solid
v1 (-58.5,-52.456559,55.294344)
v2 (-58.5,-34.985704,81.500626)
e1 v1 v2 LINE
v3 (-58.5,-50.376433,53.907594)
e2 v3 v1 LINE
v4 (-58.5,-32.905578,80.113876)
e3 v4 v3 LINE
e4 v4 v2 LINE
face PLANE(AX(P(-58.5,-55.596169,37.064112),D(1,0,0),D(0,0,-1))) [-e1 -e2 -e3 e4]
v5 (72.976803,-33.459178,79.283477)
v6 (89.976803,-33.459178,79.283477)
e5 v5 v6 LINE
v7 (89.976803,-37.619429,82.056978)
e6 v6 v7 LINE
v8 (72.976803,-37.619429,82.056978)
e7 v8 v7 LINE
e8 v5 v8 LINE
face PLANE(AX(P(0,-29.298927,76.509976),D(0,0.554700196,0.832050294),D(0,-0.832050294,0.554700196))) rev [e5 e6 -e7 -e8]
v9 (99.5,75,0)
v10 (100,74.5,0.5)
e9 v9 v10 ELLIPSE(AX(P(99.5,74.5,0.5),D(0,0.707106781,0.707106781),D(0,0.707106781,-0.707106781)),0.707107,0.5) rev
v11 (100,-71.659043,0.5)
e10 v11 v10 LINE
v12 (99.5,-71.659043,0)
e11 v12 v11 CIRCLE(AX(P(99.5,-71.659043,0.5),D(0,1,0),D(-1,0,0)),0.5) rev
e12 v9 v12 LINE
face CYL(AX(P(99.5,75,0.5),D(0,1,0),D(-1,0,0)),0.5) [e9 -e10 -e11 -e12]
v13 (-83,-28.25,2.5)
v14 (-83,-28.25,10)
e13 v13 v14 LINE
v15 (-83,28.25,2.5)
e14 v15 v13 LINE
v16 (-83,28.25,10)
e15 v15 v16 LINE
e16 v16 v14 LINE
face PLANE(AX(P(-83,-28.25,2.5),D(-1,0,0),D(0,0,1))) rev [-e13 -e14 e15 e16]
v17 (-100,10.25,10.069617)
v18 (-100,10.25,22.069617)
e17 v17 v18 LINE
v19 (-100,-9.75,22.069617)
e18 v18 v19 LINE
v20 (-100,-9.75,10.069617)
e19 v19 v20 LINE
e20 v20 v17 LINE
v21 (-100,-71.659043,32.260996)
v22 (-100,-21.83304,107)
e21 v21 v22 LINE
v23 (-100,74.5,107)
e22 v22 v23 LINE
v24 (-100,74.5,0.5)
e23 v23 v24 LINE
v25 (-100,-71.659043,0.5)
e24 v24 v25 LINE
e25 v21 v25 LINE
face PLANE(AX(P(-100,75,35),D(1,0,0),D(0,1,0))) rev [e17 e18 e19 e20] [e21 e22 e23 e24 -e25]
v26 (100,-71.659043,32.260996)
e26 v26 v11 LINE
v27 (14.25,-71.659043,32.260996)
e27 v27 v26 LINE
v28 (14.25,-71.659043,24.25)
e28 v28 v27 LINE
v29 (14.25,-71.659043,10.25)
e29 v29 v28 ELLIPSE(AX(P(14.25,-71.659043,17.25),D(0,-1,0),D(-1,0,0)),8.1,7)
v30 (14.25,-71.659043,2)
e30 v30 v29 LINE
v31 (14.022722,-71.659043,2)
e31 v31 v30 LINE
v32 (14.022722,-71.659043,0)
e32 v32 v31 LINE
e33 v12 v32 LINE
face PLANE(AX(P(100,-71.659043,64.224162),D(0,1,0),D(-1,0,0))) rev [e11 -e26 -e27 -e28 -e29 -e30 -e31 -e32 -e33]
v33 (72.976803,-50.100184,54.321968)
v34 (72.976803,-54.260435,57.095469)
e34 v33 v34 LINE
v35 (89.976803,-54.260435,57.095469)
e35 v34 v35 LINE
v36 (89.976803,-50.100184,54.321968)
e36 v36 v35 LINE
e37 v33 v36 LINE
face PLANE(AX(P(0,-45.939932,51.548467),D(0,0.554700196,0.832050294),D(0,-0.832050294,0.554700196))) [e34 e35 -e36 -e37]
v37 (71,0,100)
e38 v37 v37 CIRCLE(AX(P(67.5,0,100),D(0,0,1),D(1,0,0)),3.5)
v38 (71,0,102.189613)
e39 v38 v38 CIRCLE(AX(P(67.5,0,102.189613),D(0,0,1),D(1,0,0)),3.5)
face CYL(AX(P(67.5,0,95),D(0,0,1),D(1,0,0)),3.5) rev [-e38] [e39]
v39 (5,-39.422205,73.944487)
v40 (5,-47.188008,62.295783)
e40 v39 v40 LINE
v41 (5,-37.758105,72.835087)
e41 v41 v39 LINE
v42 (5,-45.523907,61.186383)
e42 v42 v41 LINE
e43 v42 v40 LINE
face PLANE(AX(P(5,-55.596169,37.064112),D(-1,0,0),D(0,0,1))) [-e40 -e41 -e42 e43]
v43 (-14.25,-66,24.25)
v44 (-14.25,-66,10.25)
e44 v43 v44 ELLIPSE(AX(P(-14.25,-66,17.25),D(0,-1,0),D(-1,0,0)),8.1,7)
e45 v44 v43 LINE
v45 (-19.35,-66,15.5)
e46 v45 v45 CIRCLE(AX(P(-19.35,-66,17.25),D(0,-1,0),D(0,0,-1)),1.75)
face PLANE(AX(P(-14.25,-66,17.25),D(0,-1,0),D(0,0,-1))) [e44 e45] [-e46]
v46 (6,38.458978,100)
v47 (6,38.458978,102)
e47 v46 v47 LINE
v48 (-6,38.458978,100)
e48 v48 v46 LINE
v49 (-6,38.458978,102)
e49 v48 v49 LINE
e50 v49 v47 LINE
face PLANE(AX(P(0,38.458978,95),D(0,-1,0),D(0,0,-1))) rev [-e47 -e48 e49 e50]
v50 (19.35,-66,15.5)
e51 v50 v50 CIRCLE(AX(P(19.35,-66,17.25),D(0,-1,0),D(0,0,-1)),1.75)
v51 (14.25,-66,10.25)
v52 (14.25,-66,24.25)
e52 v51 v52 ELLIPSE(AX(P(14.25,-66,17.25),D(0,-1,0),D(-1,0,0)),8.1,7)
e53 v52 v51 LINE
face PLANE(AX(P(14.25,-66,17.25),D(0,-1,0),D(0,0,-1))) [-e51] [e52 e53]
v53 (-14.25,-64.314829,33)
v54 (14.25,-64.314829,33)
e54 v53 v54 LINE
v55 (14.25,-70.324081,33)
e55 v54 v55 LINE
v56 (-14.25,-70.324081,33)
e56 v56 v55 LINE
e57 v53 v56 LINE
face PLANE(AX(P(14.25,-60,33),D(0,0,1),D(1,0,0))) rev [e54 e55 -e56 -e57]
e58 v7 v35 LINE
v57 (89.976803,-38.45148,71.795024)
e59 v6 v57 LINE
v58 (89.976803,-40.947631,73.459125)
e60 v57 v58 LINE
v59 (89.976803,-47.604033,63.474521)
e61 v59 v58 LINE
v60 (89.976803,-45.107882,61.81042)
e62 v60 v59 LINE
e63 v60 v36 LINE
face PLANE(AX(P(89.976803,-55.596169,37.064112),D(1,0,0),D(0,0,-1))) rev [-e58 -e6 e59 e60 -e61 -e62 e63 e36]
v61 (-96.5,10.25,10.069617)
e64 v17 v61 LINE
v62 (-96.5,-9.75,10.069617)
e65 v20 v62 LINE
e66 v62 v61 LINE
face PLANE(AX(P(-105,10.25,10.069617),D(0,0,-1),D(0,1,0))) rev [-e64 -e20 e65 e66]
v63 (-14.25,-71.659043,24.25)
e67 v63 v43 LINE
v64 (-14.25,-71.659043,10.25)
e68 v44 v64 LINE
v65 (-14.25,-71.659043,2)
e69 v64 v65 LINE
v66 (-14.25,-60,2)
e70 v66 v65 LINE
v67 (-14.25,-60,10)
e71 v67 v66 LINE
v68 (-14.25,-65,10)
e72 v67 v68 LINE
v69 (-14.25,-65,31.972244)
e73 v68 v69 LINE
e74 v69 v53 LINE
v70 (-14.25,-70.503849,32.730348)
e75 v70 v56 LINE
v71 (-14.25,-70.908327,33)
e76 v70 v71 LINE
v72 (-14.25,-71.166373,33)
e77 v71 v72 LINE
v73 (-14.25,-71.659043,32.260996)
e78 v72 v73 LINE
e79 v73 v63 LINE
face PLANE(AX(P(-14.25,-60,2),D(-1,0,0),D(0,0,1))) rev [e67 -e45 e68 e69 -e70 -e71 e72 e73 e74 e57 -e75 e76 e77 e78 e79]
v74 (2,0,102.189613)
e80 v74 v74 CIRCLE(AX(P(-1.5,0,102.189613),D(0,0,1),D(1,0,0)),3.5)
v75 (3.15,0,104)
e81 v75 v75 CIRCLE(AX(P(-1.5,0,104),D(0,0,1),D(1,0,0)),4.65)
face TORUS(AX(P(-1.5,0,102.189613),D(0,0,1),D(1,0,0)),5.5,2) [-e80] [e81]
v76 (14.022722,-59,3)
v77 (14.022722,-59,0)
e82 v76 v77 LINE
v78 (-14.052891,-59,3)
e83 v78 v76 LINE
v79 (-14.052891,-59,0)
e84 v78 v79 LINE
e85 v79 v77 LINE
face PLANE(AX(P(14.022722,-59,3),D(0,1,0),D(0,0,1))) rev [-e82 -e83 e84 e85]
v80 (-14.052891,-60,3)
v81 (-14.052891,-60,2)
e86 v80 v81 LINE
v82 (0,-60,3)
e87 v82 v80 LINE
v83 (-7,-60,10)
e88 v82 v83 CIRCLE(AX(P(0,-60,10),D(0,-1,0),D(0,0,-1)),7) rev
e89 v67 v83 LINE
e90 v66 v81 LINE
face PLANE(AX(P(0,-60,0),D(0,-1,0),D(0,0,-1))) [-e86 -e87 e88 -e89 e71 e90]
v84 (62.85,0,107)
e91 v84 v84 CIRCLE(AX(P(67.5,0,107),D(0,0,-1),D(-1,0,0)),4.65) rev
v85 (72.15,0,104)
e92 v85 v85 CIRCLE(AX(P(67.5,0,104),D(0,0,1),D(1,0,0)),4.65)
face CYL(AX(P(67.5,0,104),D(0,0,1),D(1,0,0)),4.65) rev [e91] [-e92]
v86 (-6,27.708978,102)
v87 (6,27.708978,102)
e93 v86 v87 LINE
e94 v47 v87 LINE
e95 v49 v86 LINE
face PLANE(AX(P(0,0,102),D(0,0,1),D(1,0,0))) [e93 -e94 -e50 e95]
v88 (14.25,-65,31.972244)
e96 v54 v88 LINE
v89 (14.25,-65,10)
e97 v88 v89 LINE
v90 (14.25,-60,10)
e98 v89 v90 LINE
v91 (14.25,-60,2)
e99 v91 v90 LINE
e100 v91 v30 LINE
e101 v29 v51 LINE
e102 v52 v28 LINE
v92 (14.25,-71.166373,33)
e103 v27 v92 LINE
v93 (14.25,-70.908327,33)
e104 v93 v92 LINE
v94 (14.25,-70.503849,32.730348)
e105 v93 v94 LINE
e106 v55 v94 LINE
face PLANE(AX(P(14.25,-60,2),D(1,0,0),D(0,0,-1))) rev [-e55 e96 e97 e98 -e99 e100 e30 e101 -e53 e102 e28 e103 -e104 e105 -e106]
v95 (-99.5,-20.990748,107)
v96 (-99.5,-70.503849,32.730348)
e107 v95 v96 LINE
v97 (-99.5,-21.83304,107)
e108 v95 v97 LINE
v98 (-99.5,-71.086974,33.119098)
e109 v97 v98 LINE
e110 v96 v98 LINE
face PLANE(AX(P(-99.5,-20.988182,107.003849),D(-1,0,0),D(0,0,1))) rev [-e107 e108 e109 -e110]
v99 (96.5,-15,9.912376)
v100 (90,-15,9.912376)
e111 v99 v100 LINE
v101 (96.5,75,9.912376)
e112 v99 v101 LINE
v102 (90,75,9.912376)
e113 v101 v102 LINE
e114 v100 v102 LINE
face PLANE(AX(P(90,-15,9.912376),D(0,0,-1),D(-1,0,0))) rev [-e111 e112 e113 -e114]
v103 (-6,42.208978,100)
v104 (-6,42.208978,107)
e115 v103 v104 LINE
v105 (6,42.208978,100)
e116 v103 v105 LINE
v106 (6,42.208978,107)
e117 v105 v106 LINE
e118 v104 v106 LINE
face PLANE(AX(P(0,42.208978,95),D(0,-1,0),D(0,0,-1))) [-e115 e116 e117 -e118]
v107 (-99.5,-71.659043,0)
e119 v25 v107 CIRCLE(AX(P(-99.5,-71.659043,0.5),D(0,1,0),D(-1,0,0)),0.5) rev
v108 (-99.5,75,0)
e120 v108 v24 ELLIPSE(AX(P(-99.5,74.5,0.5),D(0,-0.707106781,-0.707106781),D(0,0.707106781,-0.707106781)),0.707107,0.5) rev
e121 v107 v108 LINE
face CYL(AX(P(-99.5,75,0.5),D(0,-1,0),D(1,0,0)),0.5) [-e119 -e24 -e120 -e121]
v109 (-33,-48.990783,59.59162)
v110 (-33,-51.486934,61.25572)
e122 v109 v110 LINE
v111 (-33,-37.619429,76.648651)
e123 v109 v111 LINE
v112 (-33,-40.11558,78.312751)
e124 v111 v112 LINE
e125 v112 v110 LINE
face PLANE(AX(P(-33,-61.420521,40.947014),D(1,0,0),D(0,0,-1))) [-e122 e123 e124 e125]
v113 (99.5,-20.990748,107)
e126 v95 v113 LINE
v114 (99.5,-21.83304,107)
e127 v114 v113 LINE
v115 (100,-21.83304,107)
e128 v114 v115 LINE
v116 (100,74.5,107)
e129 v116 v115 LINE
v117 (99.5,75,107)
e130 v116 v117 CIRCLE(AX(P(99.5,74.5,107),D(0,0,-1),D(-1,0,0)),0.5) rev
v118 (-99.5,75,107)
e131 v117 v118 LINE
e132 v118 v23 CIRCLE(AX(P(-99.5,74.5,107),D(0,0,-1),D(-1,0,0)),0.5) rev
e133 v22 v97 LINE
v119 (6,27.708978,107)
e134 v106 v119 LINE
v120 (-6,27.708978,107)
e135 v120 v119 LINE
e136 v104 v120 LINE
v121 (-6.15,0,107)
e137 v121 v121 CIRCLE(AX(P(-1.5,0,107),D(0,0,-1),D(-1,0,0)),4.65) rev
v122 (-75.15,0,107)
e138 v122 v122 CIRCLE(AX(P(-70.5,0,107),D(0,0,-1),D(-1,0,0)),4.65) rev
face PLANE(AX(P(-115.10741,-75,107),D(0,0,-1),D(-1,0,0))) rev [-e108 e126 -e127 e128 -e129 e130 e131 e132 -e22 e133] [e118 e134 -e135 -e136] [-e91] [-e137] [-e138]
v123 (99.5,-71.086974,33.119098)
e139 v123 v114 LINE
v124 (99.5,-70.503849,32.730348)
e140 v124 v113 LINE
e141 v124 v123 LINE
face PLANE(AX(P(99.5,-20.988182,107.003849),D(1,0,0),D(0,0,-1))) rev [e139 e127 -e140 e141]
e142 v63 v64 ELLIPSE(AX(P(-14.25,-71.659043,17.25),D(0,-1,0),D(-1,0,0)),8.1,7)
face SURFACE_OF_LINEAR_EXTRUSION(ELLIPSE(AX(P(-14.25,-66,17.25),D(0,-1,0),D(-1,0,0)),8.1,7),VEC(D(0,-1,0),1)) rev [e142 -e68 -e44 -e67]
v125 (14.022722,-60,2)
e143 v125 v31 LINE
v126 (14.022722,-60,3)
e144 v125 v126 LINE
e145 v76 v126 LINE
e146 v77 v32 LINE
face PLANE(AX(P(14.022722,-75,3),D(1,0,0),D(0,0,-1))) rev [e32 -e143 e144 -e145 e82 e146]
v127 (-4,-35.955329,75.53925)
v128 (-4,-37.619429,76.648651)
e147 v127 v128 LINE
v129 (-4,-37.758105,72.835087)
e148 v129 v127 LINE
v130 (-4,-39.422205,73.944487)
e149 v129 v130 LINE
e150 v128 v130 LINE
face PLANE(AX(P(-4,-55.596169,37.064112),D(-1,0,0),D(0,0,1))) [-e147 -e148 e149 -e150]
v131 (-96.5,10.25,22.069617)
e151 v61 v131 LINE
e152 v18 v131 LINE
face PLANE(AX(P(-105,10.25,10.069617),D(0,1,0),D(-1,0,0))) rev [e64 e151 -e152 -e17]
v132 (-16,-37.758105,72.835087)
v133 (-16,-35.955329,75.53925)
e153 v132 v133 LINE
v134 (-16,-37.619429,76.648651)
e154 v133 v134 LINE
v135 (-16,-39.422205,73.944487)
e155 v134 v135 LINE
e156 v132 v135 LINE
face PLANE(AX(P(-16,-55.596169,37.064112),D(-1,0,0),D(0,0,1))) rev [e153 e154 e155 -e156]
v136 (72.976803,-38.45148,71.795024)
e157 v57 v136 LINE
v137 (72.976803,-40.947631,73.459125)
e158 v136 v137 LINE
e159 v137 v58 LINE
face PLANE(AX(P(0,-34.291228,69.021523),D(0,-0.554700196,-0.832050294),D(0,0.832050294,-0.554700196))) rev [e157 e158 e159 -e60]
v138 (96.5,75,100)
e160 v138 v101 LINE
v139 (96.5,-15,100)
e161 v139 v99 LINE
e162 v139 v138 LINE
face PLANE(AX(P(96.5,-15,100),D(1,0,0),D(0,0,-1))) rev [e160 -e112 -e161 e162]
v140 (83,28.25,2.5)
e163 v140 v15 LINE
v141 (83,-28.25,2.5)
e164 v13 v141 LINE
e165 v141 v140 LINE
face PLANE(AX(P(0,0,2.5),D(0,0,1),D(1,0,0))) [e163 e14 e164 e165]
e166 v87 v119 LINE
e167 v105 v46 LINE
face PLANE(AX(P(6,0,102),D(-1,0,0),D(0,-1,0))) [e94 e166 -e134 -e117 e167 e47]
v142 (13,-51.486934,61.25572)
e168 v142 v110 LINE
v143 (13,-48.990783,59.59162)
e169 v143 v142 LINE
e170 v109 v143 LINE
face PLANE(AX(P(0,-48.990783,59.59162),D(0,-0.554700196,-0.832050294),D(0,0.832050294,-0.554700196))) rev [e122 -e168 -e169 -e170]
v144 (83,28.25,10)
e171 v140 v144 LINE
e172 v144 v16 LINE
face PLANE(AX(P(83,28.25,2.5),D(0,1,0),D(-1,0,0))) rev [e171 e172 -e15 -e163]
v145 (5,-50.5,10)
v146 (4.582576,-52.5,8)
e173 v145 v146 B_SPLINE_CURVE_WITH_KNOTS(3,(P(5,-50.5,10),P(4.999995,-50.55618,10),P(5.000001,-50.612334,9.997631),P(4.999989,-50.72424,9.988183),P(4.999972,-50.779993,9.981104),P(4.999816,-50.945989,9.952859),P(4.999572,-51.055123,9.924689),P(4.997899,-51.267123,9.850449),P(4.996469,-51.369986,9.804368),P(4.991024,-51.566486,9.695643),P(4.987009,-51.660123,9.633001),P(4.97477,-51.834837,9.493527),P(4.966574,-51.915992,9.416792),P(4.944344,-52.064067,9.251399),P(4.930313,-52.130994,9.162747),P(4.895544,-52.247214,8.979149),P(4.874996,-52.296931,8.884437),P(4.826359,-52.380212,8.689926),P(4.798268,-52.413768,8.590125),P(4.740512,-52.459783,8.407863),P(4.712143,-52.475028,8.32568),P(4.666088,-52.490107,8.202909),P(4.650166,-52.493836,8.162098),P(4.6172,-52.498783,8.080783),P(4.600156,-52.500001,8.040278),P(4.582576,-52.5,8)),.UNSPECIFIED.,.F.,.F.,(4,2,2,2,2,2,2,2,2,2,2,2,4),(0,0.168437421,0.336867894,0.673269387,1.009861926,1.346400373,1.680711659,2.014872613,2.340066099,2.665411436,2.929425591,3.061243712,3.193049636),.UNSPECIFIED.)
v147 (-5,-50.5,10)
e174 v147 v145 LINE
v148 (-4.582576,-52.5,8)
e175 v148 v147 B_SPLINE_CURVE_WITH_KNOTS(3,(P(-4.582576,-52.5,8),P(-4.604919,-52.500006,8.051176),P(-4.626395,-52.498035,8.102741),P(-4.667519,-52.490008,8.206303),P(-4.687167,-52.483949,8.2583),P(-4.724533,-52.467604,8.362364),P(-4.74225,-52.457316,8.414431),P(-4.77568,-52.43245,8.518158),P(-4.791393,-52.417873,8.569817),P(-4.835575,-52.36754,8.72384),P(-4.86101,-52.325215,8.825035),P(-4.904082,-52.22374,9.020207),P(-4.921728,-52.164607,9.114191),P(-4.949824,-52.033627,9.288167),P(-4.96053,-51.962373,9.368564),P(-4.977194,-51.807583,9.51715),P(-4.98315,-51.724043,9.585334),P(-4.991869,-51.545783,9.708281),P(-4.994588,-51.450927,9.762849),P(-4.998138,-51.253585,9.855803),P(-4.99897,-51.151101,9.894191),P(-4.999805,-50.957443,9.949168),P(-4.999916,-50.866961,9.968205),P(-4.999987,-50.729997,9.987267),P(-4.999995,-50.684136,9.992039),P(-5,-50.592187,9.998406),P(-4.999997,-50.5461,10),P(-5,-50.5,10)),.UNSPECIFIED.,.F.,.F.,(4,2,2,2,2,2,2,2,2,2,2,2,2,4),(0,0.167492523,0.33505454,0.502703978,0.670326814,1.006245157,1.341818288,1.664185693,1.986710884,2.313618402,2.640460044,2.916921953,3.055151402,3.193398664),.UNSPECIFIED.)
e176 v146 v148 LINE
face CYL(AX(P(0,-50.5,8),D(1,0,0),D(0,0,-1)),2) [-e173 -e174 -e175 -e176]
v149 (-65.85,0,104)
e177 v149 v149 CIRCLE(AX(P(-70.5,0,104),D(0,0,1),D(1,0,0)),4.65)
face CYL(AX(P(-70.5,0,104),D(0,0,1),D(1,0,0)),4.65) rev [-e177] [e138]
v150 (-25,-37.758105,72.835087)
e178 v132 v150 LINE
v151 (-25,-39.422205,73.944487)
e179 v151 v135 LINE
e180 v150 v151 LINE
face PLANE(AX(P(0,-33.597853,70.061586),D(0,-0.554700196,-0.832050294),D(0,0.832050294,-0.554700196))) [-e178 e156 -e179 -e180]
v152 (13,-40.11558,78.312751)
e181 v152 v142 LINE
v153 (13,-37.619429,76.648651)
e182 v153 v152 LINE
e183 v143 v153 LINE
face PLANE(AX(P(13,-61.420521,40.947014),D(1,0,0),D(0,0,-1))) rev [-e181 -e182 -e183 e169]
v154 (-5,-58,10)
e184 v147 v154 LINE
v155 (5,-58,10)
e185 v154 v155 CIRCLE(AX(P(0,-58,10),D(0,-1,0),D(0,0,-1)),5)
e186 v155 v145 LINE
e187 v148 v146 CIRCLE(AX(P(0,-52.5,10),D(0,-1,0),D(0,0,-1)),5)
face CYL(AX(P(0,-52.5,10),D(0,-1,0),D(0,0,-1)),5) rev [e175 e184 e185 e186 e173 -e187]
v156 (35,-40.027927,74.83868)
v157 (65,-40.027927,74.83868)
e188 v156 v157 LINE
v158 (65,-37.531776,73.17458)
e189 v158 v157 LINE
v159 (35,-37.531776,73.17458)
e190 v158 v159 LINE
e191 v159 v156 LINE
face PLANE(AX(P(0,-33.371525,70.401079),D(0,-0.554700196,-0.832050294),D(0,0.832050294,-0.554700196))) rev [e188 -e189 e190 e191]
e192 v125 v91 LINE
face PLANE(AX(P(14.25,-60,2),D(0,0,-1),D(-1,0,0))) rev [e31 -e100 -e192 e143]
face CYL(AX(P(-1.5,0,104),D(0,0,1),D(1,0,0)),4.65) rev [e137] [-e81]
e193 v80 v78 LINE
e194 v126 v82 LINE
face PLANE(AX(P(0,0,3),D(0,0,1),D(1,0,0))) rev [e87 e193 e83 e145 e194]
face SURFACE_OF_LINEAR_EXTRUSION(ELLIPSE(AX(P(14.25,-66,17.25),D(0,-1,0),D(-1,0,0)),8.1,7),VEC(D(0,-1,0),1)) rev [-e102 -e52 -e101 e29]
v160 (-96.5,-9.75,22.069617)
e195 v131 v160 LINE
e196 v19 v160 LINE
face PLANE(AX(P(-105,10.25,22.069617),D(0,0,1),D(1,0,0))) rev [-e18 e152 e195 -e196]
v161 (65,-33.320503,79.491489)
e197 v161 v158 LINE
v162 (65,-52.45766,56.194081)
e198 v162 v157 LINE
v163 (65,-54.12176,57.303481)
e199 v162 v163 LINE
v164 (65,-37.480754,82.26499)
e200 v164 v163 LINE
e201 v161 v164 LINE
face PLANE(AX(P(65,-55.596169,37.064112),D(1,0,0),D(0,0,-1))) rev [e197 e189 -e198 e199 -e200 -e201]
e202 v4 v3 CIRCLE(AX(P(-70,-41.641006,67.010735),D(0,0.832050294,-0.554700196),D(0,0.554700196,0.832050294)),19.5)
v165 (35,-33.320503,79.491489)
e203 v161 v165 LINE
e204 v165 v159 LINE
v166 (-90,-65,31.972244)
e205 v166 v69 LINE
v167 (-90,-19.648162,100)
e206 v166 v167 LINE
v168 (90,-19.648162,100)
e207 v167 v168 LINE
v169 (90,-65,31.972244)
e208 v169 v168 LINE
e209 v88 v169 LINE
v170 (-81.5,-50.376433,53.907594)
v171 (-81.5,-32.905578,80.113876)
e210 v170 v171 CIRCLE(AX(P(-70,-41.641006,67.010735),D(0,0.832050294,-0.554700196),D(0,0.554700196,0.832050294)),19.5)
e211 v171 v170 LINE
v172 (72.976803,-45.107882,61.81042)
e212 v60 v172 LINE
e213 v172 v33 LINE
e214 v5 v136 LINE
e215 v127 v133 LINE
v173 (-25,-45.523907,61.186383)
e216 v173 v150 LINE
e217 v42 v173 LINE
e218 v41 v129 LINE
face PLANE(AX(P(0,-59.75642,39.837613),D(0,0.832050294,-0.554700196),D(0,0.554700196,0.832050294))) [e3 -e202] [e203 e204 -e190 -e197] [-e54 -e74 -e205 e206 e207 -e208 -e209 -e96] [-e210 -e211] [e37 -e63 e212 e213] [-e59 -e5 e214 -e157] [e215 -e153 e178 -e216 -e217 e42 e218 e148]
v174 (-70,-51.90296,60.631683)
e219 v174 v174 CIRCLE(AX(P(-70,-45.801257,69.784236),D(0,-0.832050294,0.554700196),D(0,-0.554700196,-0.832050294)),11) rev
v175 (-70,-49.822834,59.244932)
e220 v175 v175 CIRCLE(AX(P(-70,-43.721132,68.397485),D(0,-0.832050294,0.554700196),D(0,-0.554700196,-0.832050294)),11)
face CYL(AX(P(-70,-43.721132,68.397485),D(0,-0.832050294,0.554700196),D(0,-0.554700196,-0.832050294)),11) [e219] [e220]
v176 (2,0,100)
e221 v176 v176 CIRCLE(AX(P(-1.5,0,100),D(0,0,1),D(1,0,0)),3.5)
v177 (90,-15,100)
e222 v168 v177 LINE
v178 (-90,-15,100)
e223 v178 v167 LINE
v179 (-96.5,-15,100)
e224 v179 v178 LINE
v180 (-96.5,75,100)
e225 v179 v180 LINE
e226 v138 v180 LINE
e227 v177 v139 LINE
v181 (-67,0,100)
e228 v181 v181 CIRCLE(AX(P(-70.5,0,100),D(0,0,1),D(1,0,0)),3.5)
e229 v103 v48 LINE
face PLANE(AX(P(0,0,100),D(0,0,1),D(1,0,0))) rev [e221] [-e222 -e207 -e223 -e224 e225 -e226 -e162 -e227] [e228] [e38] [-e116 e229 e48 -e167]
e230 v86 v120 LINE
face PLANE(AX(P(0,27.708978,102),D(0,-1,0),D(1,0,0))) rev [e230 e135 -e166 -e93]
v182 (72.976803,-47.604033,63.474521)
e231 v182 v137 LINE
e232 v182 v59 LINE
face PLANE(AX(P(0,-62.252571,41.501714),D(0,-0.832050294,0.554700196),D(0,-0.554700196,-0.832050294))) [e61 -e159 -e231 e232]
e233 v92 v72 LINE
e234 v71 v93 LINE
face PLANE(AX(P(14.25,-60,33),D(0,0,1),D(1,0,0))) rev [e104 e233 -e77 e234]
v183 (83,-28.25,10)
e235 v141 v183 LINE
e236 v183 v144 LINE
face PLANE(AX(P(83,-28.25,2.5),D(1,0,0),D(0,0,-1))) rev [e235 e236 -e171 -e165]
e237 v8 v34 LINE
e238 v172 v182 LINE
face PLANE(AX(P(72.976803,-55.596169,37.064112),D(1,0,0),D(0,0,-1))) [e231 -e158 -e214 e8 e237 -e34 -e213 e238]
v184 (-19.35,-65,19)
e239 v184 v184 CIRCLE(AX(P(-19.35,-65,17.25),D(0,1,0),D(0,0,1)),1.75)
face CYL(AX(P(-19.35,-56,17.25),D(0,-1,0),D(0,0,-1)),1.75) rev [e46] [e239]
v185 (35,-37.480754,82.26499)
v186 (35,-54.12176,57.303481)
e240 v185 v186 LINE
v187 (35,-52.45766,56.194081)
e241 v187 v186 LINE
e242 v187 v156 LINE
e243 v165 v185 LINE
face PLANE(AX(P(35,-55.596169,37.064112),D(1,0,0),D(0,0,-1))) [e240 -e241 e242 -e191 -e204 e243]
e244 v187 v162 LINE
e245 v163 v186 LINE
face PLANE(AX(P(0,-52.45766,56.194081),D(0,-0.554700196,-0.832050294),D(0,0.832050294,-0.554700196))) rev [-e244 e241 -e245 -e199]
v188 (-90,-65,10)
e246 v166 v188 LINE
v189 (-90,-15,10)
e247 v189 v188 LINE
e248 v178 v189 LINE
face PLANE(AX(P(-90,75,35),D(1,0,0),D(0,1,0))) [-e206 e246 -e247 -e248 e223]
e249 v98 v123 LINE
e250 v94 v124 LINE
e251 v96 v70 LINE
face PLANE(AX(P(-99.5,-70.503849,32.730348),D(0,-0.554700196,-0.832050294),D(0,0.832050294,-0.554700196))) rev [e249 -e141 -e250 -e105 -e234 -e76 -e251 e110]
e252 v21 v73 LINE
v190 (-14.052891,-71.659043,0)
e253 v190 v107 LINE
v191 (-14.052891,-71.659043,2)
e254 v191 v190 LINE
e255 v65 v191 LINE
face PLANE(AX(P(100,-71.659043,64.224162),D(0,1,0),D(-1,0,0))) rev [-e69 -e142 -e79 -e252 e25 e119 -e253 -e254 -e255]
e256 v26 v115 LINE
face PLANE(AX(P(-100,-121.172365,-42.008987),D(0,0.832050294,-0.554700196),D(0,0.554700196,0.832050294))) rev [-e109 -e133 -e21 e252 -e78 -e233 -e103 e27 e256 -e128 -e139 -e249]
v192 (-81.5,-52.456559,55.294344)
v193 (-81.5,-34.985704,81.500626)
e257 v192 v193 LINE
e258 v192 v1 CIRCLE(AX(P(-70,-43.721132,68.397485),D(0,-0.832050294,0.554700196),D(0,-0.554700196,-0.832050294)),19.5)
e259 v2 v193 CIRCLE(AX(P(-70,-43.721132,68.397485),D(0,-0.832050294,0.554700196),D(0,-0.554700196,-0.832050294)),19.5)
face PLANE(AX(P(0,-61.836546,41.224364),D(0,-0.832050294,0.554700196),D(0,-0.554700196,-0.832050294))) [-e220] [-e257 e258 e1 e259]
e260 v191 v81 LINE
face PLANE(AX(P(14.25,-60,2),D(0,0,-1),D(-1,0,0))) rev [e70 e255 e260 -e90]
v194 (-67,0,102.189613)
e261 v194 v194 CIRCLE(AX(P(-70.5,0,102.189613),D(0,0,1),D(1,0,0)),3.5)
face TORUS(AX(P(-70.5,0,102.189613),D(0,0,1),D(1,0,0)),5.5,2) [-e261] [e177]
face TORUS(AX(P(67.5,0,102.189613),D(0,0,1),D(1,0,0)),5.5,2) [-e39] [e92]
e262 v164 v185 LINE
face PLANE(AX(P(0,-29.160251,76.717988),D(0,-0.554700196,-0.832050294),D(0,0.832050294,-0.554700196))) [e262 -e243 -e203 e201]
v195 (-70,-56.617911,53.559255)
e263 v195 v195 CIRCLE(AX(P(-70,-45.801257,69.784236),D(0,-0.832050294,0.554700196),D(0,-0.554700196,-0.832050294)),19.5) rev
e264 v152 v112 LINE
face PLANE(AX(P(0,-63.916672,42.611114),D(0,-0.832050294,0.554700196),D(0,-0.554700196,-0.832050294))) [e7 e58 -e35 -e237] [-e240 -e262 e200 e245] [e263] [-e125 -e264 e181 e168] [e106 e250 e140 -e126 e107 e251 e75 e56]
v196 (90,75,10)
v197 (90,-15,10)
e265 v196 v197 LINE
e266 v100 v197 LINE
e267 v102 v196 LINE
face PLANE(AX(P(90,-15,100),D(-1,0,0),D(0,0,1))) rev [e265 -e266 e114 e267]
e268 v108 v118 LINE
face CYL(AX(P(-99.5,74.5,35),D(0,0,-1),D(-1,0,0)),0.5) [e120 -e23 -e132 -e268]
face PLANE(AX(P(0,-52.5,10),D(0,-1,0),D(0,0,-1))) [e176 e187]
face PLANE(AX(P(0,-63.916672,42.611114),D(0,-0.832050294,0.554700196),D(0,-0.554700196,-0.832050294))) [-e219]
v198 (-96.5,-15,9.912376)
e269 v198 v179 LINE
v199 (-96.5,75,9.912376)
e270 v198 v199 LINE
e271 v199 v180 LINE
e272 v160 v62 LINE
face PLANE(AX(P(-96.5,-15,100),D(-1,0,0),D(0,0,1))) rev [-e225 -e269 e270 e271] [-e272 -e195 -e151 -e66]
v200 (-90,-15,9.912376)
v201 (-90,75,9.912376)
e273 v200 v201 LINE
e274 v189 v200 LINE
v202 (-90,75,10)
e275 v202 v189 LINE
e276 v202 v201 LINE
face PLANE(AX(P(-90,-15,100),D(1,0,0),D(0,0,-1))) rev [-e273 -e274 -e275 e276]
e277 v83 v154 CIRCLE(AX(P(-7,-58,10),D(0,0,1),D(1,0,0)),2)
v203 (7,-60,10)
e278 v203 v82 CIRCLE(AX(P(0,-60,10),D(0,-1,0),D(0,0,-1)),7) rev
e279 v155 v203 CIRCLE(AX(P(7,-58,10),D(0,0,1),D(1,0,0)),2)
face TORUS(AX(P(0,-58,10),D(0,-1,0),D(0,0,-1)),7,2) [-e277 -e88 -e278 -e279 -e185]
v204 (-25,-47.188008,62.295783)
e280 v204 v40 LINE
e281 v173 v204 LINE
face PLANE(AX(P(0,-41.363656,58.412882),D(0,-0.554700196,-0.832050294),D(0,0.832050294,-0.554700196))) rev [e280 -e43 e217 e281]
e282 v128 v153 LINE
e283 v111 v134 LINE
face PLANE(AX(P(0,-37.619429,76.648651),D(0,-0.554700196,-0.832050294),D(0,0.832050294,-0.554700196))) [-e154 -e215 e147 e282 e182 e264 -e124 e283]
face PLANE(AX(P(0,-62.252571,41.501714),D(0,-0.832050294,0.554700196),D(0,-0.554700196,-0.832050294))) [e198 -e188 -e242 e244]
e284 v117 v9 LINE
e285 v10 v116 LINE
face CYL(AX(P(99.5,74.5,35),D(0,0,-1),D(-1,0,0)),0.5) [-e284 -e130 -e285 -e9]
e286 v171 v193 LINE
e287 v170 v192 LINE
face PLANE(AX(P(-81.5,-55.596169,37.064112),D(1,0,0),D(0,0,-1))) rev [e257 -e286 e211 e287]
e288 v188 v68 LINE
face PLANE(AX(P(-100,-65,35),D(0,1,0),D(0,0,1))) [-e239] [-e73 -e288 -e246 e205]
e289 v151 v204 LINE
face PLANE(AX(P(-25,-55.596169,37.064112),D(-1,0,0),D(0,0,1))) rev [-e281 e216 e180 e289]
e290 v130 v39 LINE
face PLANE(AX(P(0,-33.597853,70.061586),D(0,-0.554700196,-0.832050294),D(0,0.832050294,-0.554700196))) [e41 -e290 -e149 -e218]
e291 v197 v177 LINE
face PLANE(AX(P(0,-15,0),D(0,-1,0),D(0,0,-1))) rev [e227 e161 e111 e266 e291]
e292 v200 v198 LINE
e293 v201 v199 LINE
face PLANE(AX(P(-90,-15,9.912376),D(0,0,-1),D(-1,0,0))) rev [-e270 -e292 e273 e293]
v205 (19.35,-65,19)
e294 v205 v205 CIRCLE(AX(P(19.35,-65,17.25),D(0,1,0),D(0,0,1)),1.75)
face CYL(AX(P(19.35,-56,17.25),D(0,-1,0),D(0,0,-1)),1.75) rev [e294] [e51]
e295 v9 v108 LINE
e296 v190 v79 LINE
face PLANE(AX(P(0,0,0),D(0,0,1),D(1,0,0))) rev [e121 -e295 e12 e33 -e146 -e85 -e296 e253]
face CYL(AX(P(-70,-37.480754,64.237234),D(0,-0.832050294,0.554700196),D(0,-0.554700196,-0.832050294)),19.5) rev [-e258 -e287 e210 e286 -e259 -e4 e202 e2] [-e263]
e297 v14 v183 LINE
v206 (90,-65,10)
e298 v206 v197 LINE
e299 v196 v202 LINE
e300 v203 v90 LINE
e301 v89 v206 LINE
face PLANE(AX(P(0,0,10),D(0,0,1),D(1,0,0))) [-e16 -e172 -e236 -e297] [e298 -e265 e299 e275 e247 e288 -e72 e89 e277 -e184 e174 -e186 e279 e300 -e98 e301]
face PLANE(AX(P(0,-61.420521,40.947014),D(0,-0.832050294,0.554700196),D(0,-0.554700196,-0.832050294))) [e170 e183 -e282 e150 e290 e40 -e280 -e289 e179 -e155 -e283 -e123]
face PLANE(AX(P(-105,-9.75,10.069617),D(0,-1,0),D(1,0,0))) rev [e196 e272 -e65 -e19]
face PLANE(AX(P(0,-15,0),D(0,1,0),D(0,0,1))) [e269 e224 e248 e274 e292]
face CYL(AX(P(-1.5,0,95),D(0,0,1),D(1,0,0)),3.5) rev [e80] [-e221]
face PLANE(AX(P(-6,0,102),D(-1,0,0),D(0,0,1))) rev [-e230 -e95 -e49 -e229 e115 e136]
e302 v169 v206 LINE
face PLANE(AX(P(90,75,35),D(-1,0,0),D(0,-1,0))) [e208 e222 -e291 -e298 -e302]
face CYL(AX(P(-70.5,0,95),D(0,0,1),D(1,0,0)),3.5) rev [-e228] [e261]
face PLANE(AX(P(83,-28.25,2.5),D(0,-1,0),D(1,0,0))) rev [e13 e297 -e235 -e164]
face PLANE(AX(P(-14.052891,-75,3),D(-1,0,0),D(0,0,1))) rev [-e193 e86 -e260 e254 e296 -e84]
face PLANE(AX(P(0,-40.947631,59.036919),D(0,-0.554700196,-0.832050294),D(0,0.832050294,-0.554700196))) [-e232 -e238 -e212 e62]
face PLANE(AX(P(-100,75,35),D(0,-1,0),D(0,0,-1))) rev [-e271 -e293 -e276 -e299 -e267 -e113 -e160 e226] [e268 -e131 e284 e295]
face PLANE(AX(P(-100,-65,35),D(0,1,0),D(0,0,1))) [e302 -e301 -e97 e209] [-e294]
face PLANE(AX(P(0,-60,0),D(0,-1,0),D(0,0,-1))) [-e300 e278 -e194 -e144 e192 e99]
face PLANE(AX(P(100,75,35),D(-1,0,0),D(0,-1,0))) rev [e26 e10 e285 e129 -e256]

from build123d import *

# Parameters (mm, degrees)
SKETCH2_W           = 200
SKETCH2_H           = 150
BOSS_EXTRUDE1_DEPTH = 35
SKETCH3_W           = 200
SKETCH3_H           = 100
BOSS_EXTRUDE2_DEPTH = 75
LOFT3_START         = -100
LOFT3_DEPTH         = 200
SHELL2_T            = -10
SKETCH26_W          = 28.5
SKETCH26_H          = 31
CUT_EXTRUDE12_DEPTH = 15
SKETCH28_RX         = 8.1
SKETCH28_RY         = 7
CUT_EXTRUDE13_DEPTH = 9
SKETCH29_R          = 5
CUT_EXTRUDE14_DEPTH = 7.5
FILLET1_R           = 2
FILLET2_R           = 0.5
FILLET3_R           = 2
SKETCH30_R          = 1.75
CUT_EXTRUDE16_DEPTH = 10
SKETCH34_R          = 3.5
CUT_EXTRUDE18_DEPTH = 15
SKETCH34_3_R        = 4.65
SKETCH34_3_R_2      = 3.5
CUT_EXTRUDE19_DEPTH = 6
FILLET4_R           = 2
SKETCH35_W          = 166
SKETCH35_H          = 56.5
CUT_EXTRUDE20_DEPTH = 7.5
SKETCH6_W           = 30
SKETCH6_H           = 14
SKETCH6_H_2         = 7.591980562
SKETCH6_W_2         = 17
SKETCH6_H_3         = 9
CUT_EXTRUDE23_DEPTH = 15
CUT_EXTRUDE25_DEPTH = 8
SKETCH6_7_R         = 11
CUT_EXTRUDE26_DEPTH = 7.5
SKETCH6_8_W         = 30
SKETCH6_8_H         = 22.408019438
CUT_EXTRUDE27_DEPTH = 7
SKETCH6_9_W         = 17
SKETCH6_9_H         = 12
CUT_EXTRUDE28_DEPTH = 7
SKETCH6_10_W        = 12
SKETCH6_10_H        = 3.25
CUT_EXTRUDE29_DEPTH = 15
SKETCH46_W          = 12
SKETCH46_H          = 10.75
CUT_EXTRUDE31_DEPTH = 8
SKETCH46_5_W        = 12
SKETCH46_5_H        = 3.75
CUT_EXTRUDE32_DEPTH = 15
SKETCH47_W          = 12
SKETCH47_H          = 20
CUT_EXTRUDE33_DEPTH = 15
SKETCH49_W          = 199
SKETCH49_H          = 89.265638732
CUT_EXTRUDE34_DEPTH = 5
SKETCH56_W          = 199
SKETCH56_H          = 33.894448725
CUT_EXTRUDE37_DEPTH = 3
SKETCH48_W          = 28.075612318
SKETCH48_H          = 16
CUT_EXTRUDE38_DEPTH = 3
SKETCH57_W          = 6.5
SKETCH57_H          = 90.087623696
CUT_EXTRUDE39_DEPTH = 90
SKETCH69_W          = 228.232533895
SKETCH69_H          = 6
CUT_EXTRUDE44_DEPTH = 150
CUT_EXTRUDE46_DEPTH = 239.901653406
SKETCH72_W          = 67.134585738
SKETCH72_H          = 6.170384585
CUT_EXTRUDE48_DEPTH = 239.901653406


# Read off the part's stored shape, not the designer's step: Loft3
with BuildPart() as part:
    # Sketch2 → Boss-Extrude1 (new body)
    with BuildSketch(Plane.XY):
        Rectangle(SKETCH2_W, SKETCH2_H)
    extrude(amount=BOSS_EXTRUDE1_DEPTH)

    # Sketch3 → Boss-Extrude2 (add)
    with BuildSketch(Plane.XY.offset(35)):
        with Locations((0, 25)):
            Rectangle(SKETCH3_W, SKETCH3_H)
    extrude(amount=BOSS_EXTRUDE2_DEPTH)

    # Loft3 outline → Loft3 (add)
    with BuildSketch(Plane.YZ.offset(LOFT3_START)):
        Polygon((-25, 110), (-75, 35), (-25, 35), align=None)
    extrude(amount=LOFT3_DEPTH)

    # Shell2
    shell2_openings = [part.faces().sort_by_distance(p)[0] for p in [
        (0, 75, 55),
    ]]
    offset(amount=SHELL2_T, openings=shell2_openings, kind=Kind.INTERSECTION)

    # Sketch26 → Cut-Extrude12 (cut)
    with BuildSketch(Plane.XZ.offset(75)):
        with Locations((0, 17.5)):
            Rectangle(SKETCH26_W, SKETCH26_H)
    extrude(amount=-CUT_EXTRUDE12_DEPTH, mode=Mode.SUBTRACT)

    # Sketch28 → Cut-Extrude13 (cut)
    with BuildSketch(Plane.XZ.offset(75)):
        with Locations(Location((14.25, 17.25), (0, 0, -180))):
            Ellipse(SKETCH28_RX, SKETCH28_RY)
        with Locations(Location((-14.25, 17.25), (0, 0, -180))):
            Ellipse(SKETCH28_RX, SKETCH28_RY)
    extrude(amount=-CUT_EXTRUDE13_DEPTH, mode=Mode.SUBTRACT)

    # Sketch29 → Cut-Extrude14 (cut)
    with BuildSketch(Plane.XZ.offset(60)):
        with Locations((0, 10)):
            Circle(SKETCH29_R)
    extrude(amount=-CUT_EXTRUDE14_DEPTH, mode=Mode.SUBTRACT)

    # Fillet1
    fillet1_edges = [part.edges().sort_by_distance(p)[0] for p in [
        (0, -60, 5),
        (0, -52.5, 10),
    ]]
    fillet(fillet1_edges, radius=FILLET1_R)

    # Fillet2
    fillet2_edges = [part.edges().sort_by_distance(p)[0] for p in [
        (-100, 25, 110),
        (0, -25, 110),
        (100, 25, 110),
        (0, 75, 110),
        (100, -50, 72.5),
        (-100, -50, 72.5),
        (-100, 0, 0),
        (100, 0, 0),
        (100, -75, 17.5),
        (-100, -75, 17.5),
        (-100, 75, 55),
        (100, 75, 55),
    ]]
    fillet(fillet2_edges, radius=FILLET2_R)

    # Fillet3
    # the kernel refuses this fillet: 2 mm, written as the material it takes off along each edge
    with BuildSketch(Plane(origin=(-100, -73, 34.394448725), x_dir=(0, -1, 0), z_dir=(0, 0, -1))) as fillet3_piece_1:
        with BuildLine():
            CenterArc((1.5, -0.5), 0.5, 0, 90)
            Line((2, -0.5), (2, 0))
            Line((2, 0), (1.5, 0))
        make_face()
    revolve(axis=Axis((-100, -73, 34.394448725), (-1, 0, 0)), revolution_arc=33.690067526, mode=Mode.SUBTRACT)
    with BuildSketch(Plane(origin=(100, -73, 34.394448725), x_dir=(0, -0.8320502943378437, 0.5547001962252291), z_dir=(0, 0.5547001962252291, 0.8320502943378437))) as fillet3_piece_2:
        with BuildLine():
            CenterArc((1.5, -0.5), 0.5, 0, 90)
            Line((2, -0.5), (2, 0))
            Line((2, 0), (1.5, 0))
        make_face()
    revolve(axis=Axis((100, -73, 34.394448725), (1, 0, 0)), revolution_arc=33.690067526, mode=Mode.SUBTRACT)
    with BuildSketch(Plane(origin=(100, -75, 35), x_dir=(0, 0, -1), z_dir=(-1, 0, 0))) as fillet3_piece_3:
        with BuildLine():
            CenterArc((FILLET3_R * 0.302775637732, -FILLET3_R), FILLET3_R, 90, 33.690067526)
            Line((-FILLET3_R * 0.251924558493, -FILLET3_R * 0.167949705662), (0, 0))
            Line((0, 0), (FILLET3_R * 0.302775637732, 0))
        make_face()
    extrude(amount=200, mode=Mode.SUBTRACT)

    # Sketch30 → Cut-Extrude16 (cut)
    with BuildSketch(Plane.XZ.offset(66)):
        with Locations(Location((19.35, 17.25, 0), (0, 0, 270))):
            Circle(SKETCH30_R)
        with Locations(Location((-19.35, 17.25, 0), (0, 0, 270))):
            Circle(SKETCH30_R)
    extrude(amount=-CUT_EXTRUDE16_DEPTH, mode=Mode.SUBTRACT)

    # Sketch34 → Cut-Extrude18 (cut)
    with BuildSketch(Plane.XY.offset(110)):
        with Locations((-70.5, 0)):
            Circle(SKETCH34_R)
        with Locations((-1.5, 0)):
            Circle(SKETCH34_R)
        with Locations((67.5, 0)):
            Circle(SKETCH34_R)
    extrude(amount=-CUT_EXTRUDE18_DEPTH, mode=Mode.SUBTRACT)

    # Sketch34<3> → Cut-Extrude19 (cut)
    # profile 1 of 3: a face of its own
    with BuildSketch(Plane.XY.offset(110)):
        with Locations((-70.5, 0)):
            Circle(SKETCH34_3_R)
        with Locations((-70.5, 0)):
            Circle(SKETCH34_3_R_2, mode=Mode.SUBTRACT)
    # profile 2 of 3: a face of its own
    with BuildSketch(Plane.XY.offset(110)):
        with Locations((-1.5, 0)):
            Circle(SKETCH34_3_R)
        with Locations((-1.5, 0)):
            Circle(SKETCH34_3_R_2, mode=Mode.SUBTRACT)
    # profile 3 of 3: a face of its own
    with BuildSketch(Plane.XY.offset(110)):
        with Locations((67.5, 0)):
            Circle(SKETCH34_3_R)
        with Locations((67.5, 0)):
            Circle(SKETCH34_3_R_2, mode=Mode.SUBTRACT)
    extrude(amount=-CUT_EXTRUDE19_DEPTH, mode=Mode.SUBTRACT)

    # Fillet4
    # the kernel refuses this fillet: 2 mm, written as the material it takes off along each edge
    with BuildSketch(Plane(origin=(-70.5, 0, 104), x_dir=(1, 0, 0), z_dir=(0, -1, 0))) as fillet4_piece_1:
        with BuildLine():
            CenterArc((5.5, -1.810386699), FILLET4_R, 115.150663413, 64.849336587)
            Line((4.65, 0), (4.633, 0.036207734))
            ThreePointArc((4.633, 0.036207734), (4.075, 0.04), (3.5, 0.04))
            Line((3.5, 0.04), (3.46, 0))
            Line((3.46, 0), (3.46, -1.810386699))
            Line((3.46, -1.810386699), (3.5, -1.810386699))
        make_face()
    revolve(axis=Axis((-70.5, 0, 104), (0, 0, 1)), mode=Mode.SUBTRACT)
    with BuildSketch(Plane(origin=(-1.5, 0, 104), x_dir=(1, 0, 0), z_dir=(0, -1, 0))) as fillet4_piece_2:
        with BuildLine():
            CenterArc((5.5, -1.810386699), FILLET4_R, 115.150663413, 64.849336587)
            Line((4.65, 0), (4.633, 0.036207734))
            ThreePointArc((4.633, 0.036207734), (4.075, 0.04), (3.5, 0.04))
            Line((3.5, 0.04), (3.46, 0))
            Line((3.46, 0), (3.46, -1.810386699))
            Line((3.46, -1.810386699), (3.5, -1.810386699))
        make_face()
    revolve(axis=Axis((-1.5, 0, 104), (0, 0, 1)), mode=Mode.SUBTRACT)
    with BuildSketch(Plane(origin=(67.5, 0, 104), x_dir=(1, 0, 0), z_dir=(0, -1, 0))) as fillet4_piece_3:
        with BuildLine():
            CenterArc((5.5, -1.810386699), FILLET4_R, 115.150663413, 64.849336587)
            Line((4.65, 0), (4.633, 0.036207734))
            ThreePointArc((4.633, 0.036207734), (4.075, 0.04), (3.5, 0.04))
            Line((3.5, 0.04), (3.46, 0))
            Line((3.46, 0), (3.46, -1.810386699))
            Line((3.46, -1.810386699), (3.5, -1.810386699))
        make_face()
    revolve(axis=Axis((67.5, 0, 104), (0, 0, 1)), mode=Mode.SUBTRACT)

    # Sketch35 → Cut-Extrude20 (cut)
    with BuildSketch(Plane.XY.offset(10)):
        Rectangle(SKETCH35_W, SKETCH35_H)
    extrude(amount=-CUT_EXTRUDE20_DEPTH, mode=Mode.SUBTRACT)

    # Sketch6 → Cut-Extrude23 (cut)
    with BuildSketch(Plane(origin=(0, -68.076923077, 45.384615385), x_dir=(1, 0, 0), z_dir=(0, -0.8320502943378438, 0.554700196225229))):
        with Locations((-10, 32.658027472)):
            Rectangle(SKETCH6_W, SKETCH6_H)
        with BuildLine():
            Line((-58.5, 48.40604322), (-58.5, 16.910011724))
            ThreePointArc((-58.5, 16.910011724), (-52.614661349, 23.826266605), (-50.5, 32.658027472))
            ThreePointArc((-50.5, 32.658027472), (-52.614661349, 41.489788338), (-58.5, 48.40604322))
        make_face()
        with BuildLine():
            ThreePointArc((-81.5, 48.40604322), (-89.5, 32.658027472), (-81.5, 16.910011724))
            Line((-81.5, 16.910011724), (-81.5, 48.40604322))
        make_face()
        with Locations((50, 43.862037191)):
            Rectangle(SKETCH6_W, SKETCH6_H_2)
        with Locations((81.47680337, 21.908027472)):
            Rectangle(SKETCH6_W_2, SKETCH6_H_3)
        with Locations((81.47680337, 42.908027472)):
            Rectangle(SKETCH6_W_2, SKETCH6_H_3)
    extrude(amount=-CUT_EXTRUDE23_DEPTH, mode=Mode.SUBTRACT)

    # Sketch6<6> → Cut-Extrude25 (cut)
    with BuildSketch(Plane(origin=(0, -68.076923077, 45.384615385), x_dir=(1, 0, 0), z_dir=(0, -0.8320502943378438, 0.554700196225229))):
        Polygon((-33, 42.908027472), (-33, 22.408027472), (13, 22.408027472), (13, 42.908027472), (-4, 42.908027472), (-4, 39.658027472), (5, 39.658027472), (5, 25.658027472), (-25, 25.658027472), (-25, 39.658027472), (-16, 39.658027472), (-16, 42.908027472), align=None)
    extrude(amount=-CUT_EXTRUDE25_DEPTH, mode=Mode.SUBTRACT)

    # Sketch6<7> → Cut-Extrude26 (cut)
    with BuildSketch(Plane(origin=(0, -68.076923077, 45.384615385), x_dir=(1, 0, 0), z_dir=(0, -0.8320502943378438, 0.554700196225229))):
        with BuildLine():
            Line((-81.5, 48.40604322), (-81.5, 16.910011724))
            ThreePointArc((-81.5, 16.910011724), (-70, 13.158027472), (-58.5, 16.910011724))
            Line((-58.5, 16.910011724), (-58.5, 48.40604322))
            ThreePointArc((-58.5, 48.40604322), (-70, 52.158027472), (-81.5, 48.40604322))
        make_face()
        with Locations(Location((-70, 32.658027472, 0), (0, 0, 270))):
            Circle(SKETCH6_7_R, mode=Mode.SUBTRACT)
    extrude(amount=-CUT_EXTRUDE26_DEPTH, mode=Mode.SUBTRACT)

    # Sketch6<8> → Cut-Extrude27 (cut)
    with BuildSketch(Plane(origin=(0, -68.076923077, 45.384615385), x_dir=(1, 0, 0), z_dir=(0, -0.8320502943378438, 0.554700196225229))):
        with Locations((50, 28.862037191)):
            Rectangle(SKETCH6_8_W, SKETCH6_8_H)
    extrude(amount=-CUT_EXTRUDE27_DEPTH, mode=Mode.SUBTRACT)

    # Sketch6<9> → Cut-Extrude28 (cut)
    with BuildSketch(Plane(origin=(0, -68.076923077, 45.384615385), x_dir=(1, 0, 0), z_dir=(0, -0.8320502943378438, 0.554700196225229))):
        with Locations((81.47680337, 32.408027472)):
            Rectangle(SKETCH6_9_W, SKETCH6_9_H)
    extrude(amount=-CUT_EXTRUDE28_DEPTH, mode=Mode.SUBTRACT)

    # Sketch6<10> → Cut-Extrude29 (cut)
    with BuildSketch(Plane(origin=(0, -68.076923077, 45.384615385), x_dir=(1, 0, 0), z_dir=(0, -0.8320502943378438, 0.554700196225229))):
        with Locations((-10, 41.283027472)):
            Rectangle(SKETCH6_10_W, SKETCH6_10_H)
    extrude(amount=-CUT_EXTRUDE29_DEPTH, mode=Mode.SUBTRACT)

    # Sketch46 → Cut-Extrude31 (cut)
    with BuildSketch(Plane.XY.offset(110)):
        with Locations((0, 33.083977923)):
            Rectangle(SKETCH46_W, SKETCH46_H)
    extrude(amount=-CUT_EXTRUDE31_DEPTH, mode=Mode.SUBTRACT)

    # Sketch46<5> → Cut-Extrude32 (cut)
    with BuildSketch(Plane.XY.offset(110)):
        with Locations((0, 40.333977923)):
            Rectangle(SKETCH46_5_W, SKETCH46_5_H)
    extrude(amount=-CUT_EXTRUDE32_DEPTH, mode=Mode.SUBTRACT)

    # Sketch47 → Cut-Extrude33 (cut)
    with BuildSketch(Plane(origin=(-90, 0, 0), x_dir=(0, 0, -1), z_dir=(1, 0, 0))):
        with Locations((-16.069616756, 0.25)):
            Rectangle(SKETCH47_W, SKETCH47_H)
    extrude(amount=-CUT_EXTRUDE33_DEPTH, mode=Mode.SUBTRACT)

    # Sketch49 → Cut-Extrude34 (cut)
    with BuildSketch(Plane(origin=(0, -68.076923077, 45.384615385), x_dir=(1, 0, 0), z_dir=(0, -0.8320502943378438, 0.554700196225229))):
        with Locations((0, 32.757616226)):
            Rectangle(SKETCH49_W, SKETCH49_H)
    extrude(amount=-CUT_EXTRUDE34_DEPTH, mode=Mode.SUBTRACT)

    # Sketch56 → Cut-Extrude37 (cut)
    with BuildSketch(Plane.XZ.offset(75)):
        with Locations((0, 17.447224363)):
            Rectangle(SKETCH56_W, SKETCH56_H)
    extrude(amount=-CUT_EXTRUDE37_DEPTH, mode=Mode.SUBTRACT)

    # Sketch48 → Cut-Extrude38 (cut)
    with BuildSketch(Plane(origin=(0, 0, 0), x_dir=(-1, 0, 0), z_dir=(0, 0, -1))):
        with Locations((0.015084374, -67)):
            Rectangle(SKETCH48_W, SKETCH48_H)
    extrude(amount=-CUT_EXTRUDE38_DEPTH, mode=Mode.SUBTRACT)

    # Sketch57 → Cut-Extrude39 (cut)
    with BuildSketch(Plane(origin=(0, 75, 0), x_dir=(1, 0, 0), z_dir=(0, 1, 0))):
        with Locations((-93.25, -54.956188152)):
            Rectangle(SKETCH57_W, SKETCH57_H)
        with Locations((93.25, -54.956188152)):
            Rectangle(SKETCH57_W, SKETCH57_H)
    extrude(amount=-CUT_EXTRUDE39_DEPTH, mode=Mode.SUBTRACT)

    # Sketch69 → Cut-Extrude44 (cut)
    with BuildSketch(Plane(origin=(0, 75, 0), x_dir=(1, 0, 0), z_dir=(0, 1, 0))):
        with Locations((-0.991143308, -110)):
            Rectangle(SKETCH69_W, SKETCH69_H)
    extrude(amount=-CUT_EXTRUDE44_DEPTH, mode=Mode.SUBTRACT)

    # Sketch70 → Cut-Extrude46 (cut, through all)
    with BuildSketch(Plane(origin=(100, 0, 0), x_dir=(0, 0, -1), z_dir=(1, 0, 0))):
        Polygon((42.008986785, -121.172364576), (-107.615249255, -21.422873882), (-112.384750745, -28.577126118), (37.239485295, -128.326616811), align=None)
    extrude(amount=-CUT_EXTRUDE46_DEPTH, mode=Mode.SUBTRACT)

    # Sketch72 → Cut-Extrude48 (cut, through all)
    with BuildSketch(Plane.ZY.offset(100)):
        with Locations((30.656869063, -74.744235043)):
            Rectangle(SKETCH72_W, SKETCH72_H)
    extrude(amount=-CUT_EXTRUDE48_DEPTH, mode=Mode.SUBTRACT)


solid = part.part
